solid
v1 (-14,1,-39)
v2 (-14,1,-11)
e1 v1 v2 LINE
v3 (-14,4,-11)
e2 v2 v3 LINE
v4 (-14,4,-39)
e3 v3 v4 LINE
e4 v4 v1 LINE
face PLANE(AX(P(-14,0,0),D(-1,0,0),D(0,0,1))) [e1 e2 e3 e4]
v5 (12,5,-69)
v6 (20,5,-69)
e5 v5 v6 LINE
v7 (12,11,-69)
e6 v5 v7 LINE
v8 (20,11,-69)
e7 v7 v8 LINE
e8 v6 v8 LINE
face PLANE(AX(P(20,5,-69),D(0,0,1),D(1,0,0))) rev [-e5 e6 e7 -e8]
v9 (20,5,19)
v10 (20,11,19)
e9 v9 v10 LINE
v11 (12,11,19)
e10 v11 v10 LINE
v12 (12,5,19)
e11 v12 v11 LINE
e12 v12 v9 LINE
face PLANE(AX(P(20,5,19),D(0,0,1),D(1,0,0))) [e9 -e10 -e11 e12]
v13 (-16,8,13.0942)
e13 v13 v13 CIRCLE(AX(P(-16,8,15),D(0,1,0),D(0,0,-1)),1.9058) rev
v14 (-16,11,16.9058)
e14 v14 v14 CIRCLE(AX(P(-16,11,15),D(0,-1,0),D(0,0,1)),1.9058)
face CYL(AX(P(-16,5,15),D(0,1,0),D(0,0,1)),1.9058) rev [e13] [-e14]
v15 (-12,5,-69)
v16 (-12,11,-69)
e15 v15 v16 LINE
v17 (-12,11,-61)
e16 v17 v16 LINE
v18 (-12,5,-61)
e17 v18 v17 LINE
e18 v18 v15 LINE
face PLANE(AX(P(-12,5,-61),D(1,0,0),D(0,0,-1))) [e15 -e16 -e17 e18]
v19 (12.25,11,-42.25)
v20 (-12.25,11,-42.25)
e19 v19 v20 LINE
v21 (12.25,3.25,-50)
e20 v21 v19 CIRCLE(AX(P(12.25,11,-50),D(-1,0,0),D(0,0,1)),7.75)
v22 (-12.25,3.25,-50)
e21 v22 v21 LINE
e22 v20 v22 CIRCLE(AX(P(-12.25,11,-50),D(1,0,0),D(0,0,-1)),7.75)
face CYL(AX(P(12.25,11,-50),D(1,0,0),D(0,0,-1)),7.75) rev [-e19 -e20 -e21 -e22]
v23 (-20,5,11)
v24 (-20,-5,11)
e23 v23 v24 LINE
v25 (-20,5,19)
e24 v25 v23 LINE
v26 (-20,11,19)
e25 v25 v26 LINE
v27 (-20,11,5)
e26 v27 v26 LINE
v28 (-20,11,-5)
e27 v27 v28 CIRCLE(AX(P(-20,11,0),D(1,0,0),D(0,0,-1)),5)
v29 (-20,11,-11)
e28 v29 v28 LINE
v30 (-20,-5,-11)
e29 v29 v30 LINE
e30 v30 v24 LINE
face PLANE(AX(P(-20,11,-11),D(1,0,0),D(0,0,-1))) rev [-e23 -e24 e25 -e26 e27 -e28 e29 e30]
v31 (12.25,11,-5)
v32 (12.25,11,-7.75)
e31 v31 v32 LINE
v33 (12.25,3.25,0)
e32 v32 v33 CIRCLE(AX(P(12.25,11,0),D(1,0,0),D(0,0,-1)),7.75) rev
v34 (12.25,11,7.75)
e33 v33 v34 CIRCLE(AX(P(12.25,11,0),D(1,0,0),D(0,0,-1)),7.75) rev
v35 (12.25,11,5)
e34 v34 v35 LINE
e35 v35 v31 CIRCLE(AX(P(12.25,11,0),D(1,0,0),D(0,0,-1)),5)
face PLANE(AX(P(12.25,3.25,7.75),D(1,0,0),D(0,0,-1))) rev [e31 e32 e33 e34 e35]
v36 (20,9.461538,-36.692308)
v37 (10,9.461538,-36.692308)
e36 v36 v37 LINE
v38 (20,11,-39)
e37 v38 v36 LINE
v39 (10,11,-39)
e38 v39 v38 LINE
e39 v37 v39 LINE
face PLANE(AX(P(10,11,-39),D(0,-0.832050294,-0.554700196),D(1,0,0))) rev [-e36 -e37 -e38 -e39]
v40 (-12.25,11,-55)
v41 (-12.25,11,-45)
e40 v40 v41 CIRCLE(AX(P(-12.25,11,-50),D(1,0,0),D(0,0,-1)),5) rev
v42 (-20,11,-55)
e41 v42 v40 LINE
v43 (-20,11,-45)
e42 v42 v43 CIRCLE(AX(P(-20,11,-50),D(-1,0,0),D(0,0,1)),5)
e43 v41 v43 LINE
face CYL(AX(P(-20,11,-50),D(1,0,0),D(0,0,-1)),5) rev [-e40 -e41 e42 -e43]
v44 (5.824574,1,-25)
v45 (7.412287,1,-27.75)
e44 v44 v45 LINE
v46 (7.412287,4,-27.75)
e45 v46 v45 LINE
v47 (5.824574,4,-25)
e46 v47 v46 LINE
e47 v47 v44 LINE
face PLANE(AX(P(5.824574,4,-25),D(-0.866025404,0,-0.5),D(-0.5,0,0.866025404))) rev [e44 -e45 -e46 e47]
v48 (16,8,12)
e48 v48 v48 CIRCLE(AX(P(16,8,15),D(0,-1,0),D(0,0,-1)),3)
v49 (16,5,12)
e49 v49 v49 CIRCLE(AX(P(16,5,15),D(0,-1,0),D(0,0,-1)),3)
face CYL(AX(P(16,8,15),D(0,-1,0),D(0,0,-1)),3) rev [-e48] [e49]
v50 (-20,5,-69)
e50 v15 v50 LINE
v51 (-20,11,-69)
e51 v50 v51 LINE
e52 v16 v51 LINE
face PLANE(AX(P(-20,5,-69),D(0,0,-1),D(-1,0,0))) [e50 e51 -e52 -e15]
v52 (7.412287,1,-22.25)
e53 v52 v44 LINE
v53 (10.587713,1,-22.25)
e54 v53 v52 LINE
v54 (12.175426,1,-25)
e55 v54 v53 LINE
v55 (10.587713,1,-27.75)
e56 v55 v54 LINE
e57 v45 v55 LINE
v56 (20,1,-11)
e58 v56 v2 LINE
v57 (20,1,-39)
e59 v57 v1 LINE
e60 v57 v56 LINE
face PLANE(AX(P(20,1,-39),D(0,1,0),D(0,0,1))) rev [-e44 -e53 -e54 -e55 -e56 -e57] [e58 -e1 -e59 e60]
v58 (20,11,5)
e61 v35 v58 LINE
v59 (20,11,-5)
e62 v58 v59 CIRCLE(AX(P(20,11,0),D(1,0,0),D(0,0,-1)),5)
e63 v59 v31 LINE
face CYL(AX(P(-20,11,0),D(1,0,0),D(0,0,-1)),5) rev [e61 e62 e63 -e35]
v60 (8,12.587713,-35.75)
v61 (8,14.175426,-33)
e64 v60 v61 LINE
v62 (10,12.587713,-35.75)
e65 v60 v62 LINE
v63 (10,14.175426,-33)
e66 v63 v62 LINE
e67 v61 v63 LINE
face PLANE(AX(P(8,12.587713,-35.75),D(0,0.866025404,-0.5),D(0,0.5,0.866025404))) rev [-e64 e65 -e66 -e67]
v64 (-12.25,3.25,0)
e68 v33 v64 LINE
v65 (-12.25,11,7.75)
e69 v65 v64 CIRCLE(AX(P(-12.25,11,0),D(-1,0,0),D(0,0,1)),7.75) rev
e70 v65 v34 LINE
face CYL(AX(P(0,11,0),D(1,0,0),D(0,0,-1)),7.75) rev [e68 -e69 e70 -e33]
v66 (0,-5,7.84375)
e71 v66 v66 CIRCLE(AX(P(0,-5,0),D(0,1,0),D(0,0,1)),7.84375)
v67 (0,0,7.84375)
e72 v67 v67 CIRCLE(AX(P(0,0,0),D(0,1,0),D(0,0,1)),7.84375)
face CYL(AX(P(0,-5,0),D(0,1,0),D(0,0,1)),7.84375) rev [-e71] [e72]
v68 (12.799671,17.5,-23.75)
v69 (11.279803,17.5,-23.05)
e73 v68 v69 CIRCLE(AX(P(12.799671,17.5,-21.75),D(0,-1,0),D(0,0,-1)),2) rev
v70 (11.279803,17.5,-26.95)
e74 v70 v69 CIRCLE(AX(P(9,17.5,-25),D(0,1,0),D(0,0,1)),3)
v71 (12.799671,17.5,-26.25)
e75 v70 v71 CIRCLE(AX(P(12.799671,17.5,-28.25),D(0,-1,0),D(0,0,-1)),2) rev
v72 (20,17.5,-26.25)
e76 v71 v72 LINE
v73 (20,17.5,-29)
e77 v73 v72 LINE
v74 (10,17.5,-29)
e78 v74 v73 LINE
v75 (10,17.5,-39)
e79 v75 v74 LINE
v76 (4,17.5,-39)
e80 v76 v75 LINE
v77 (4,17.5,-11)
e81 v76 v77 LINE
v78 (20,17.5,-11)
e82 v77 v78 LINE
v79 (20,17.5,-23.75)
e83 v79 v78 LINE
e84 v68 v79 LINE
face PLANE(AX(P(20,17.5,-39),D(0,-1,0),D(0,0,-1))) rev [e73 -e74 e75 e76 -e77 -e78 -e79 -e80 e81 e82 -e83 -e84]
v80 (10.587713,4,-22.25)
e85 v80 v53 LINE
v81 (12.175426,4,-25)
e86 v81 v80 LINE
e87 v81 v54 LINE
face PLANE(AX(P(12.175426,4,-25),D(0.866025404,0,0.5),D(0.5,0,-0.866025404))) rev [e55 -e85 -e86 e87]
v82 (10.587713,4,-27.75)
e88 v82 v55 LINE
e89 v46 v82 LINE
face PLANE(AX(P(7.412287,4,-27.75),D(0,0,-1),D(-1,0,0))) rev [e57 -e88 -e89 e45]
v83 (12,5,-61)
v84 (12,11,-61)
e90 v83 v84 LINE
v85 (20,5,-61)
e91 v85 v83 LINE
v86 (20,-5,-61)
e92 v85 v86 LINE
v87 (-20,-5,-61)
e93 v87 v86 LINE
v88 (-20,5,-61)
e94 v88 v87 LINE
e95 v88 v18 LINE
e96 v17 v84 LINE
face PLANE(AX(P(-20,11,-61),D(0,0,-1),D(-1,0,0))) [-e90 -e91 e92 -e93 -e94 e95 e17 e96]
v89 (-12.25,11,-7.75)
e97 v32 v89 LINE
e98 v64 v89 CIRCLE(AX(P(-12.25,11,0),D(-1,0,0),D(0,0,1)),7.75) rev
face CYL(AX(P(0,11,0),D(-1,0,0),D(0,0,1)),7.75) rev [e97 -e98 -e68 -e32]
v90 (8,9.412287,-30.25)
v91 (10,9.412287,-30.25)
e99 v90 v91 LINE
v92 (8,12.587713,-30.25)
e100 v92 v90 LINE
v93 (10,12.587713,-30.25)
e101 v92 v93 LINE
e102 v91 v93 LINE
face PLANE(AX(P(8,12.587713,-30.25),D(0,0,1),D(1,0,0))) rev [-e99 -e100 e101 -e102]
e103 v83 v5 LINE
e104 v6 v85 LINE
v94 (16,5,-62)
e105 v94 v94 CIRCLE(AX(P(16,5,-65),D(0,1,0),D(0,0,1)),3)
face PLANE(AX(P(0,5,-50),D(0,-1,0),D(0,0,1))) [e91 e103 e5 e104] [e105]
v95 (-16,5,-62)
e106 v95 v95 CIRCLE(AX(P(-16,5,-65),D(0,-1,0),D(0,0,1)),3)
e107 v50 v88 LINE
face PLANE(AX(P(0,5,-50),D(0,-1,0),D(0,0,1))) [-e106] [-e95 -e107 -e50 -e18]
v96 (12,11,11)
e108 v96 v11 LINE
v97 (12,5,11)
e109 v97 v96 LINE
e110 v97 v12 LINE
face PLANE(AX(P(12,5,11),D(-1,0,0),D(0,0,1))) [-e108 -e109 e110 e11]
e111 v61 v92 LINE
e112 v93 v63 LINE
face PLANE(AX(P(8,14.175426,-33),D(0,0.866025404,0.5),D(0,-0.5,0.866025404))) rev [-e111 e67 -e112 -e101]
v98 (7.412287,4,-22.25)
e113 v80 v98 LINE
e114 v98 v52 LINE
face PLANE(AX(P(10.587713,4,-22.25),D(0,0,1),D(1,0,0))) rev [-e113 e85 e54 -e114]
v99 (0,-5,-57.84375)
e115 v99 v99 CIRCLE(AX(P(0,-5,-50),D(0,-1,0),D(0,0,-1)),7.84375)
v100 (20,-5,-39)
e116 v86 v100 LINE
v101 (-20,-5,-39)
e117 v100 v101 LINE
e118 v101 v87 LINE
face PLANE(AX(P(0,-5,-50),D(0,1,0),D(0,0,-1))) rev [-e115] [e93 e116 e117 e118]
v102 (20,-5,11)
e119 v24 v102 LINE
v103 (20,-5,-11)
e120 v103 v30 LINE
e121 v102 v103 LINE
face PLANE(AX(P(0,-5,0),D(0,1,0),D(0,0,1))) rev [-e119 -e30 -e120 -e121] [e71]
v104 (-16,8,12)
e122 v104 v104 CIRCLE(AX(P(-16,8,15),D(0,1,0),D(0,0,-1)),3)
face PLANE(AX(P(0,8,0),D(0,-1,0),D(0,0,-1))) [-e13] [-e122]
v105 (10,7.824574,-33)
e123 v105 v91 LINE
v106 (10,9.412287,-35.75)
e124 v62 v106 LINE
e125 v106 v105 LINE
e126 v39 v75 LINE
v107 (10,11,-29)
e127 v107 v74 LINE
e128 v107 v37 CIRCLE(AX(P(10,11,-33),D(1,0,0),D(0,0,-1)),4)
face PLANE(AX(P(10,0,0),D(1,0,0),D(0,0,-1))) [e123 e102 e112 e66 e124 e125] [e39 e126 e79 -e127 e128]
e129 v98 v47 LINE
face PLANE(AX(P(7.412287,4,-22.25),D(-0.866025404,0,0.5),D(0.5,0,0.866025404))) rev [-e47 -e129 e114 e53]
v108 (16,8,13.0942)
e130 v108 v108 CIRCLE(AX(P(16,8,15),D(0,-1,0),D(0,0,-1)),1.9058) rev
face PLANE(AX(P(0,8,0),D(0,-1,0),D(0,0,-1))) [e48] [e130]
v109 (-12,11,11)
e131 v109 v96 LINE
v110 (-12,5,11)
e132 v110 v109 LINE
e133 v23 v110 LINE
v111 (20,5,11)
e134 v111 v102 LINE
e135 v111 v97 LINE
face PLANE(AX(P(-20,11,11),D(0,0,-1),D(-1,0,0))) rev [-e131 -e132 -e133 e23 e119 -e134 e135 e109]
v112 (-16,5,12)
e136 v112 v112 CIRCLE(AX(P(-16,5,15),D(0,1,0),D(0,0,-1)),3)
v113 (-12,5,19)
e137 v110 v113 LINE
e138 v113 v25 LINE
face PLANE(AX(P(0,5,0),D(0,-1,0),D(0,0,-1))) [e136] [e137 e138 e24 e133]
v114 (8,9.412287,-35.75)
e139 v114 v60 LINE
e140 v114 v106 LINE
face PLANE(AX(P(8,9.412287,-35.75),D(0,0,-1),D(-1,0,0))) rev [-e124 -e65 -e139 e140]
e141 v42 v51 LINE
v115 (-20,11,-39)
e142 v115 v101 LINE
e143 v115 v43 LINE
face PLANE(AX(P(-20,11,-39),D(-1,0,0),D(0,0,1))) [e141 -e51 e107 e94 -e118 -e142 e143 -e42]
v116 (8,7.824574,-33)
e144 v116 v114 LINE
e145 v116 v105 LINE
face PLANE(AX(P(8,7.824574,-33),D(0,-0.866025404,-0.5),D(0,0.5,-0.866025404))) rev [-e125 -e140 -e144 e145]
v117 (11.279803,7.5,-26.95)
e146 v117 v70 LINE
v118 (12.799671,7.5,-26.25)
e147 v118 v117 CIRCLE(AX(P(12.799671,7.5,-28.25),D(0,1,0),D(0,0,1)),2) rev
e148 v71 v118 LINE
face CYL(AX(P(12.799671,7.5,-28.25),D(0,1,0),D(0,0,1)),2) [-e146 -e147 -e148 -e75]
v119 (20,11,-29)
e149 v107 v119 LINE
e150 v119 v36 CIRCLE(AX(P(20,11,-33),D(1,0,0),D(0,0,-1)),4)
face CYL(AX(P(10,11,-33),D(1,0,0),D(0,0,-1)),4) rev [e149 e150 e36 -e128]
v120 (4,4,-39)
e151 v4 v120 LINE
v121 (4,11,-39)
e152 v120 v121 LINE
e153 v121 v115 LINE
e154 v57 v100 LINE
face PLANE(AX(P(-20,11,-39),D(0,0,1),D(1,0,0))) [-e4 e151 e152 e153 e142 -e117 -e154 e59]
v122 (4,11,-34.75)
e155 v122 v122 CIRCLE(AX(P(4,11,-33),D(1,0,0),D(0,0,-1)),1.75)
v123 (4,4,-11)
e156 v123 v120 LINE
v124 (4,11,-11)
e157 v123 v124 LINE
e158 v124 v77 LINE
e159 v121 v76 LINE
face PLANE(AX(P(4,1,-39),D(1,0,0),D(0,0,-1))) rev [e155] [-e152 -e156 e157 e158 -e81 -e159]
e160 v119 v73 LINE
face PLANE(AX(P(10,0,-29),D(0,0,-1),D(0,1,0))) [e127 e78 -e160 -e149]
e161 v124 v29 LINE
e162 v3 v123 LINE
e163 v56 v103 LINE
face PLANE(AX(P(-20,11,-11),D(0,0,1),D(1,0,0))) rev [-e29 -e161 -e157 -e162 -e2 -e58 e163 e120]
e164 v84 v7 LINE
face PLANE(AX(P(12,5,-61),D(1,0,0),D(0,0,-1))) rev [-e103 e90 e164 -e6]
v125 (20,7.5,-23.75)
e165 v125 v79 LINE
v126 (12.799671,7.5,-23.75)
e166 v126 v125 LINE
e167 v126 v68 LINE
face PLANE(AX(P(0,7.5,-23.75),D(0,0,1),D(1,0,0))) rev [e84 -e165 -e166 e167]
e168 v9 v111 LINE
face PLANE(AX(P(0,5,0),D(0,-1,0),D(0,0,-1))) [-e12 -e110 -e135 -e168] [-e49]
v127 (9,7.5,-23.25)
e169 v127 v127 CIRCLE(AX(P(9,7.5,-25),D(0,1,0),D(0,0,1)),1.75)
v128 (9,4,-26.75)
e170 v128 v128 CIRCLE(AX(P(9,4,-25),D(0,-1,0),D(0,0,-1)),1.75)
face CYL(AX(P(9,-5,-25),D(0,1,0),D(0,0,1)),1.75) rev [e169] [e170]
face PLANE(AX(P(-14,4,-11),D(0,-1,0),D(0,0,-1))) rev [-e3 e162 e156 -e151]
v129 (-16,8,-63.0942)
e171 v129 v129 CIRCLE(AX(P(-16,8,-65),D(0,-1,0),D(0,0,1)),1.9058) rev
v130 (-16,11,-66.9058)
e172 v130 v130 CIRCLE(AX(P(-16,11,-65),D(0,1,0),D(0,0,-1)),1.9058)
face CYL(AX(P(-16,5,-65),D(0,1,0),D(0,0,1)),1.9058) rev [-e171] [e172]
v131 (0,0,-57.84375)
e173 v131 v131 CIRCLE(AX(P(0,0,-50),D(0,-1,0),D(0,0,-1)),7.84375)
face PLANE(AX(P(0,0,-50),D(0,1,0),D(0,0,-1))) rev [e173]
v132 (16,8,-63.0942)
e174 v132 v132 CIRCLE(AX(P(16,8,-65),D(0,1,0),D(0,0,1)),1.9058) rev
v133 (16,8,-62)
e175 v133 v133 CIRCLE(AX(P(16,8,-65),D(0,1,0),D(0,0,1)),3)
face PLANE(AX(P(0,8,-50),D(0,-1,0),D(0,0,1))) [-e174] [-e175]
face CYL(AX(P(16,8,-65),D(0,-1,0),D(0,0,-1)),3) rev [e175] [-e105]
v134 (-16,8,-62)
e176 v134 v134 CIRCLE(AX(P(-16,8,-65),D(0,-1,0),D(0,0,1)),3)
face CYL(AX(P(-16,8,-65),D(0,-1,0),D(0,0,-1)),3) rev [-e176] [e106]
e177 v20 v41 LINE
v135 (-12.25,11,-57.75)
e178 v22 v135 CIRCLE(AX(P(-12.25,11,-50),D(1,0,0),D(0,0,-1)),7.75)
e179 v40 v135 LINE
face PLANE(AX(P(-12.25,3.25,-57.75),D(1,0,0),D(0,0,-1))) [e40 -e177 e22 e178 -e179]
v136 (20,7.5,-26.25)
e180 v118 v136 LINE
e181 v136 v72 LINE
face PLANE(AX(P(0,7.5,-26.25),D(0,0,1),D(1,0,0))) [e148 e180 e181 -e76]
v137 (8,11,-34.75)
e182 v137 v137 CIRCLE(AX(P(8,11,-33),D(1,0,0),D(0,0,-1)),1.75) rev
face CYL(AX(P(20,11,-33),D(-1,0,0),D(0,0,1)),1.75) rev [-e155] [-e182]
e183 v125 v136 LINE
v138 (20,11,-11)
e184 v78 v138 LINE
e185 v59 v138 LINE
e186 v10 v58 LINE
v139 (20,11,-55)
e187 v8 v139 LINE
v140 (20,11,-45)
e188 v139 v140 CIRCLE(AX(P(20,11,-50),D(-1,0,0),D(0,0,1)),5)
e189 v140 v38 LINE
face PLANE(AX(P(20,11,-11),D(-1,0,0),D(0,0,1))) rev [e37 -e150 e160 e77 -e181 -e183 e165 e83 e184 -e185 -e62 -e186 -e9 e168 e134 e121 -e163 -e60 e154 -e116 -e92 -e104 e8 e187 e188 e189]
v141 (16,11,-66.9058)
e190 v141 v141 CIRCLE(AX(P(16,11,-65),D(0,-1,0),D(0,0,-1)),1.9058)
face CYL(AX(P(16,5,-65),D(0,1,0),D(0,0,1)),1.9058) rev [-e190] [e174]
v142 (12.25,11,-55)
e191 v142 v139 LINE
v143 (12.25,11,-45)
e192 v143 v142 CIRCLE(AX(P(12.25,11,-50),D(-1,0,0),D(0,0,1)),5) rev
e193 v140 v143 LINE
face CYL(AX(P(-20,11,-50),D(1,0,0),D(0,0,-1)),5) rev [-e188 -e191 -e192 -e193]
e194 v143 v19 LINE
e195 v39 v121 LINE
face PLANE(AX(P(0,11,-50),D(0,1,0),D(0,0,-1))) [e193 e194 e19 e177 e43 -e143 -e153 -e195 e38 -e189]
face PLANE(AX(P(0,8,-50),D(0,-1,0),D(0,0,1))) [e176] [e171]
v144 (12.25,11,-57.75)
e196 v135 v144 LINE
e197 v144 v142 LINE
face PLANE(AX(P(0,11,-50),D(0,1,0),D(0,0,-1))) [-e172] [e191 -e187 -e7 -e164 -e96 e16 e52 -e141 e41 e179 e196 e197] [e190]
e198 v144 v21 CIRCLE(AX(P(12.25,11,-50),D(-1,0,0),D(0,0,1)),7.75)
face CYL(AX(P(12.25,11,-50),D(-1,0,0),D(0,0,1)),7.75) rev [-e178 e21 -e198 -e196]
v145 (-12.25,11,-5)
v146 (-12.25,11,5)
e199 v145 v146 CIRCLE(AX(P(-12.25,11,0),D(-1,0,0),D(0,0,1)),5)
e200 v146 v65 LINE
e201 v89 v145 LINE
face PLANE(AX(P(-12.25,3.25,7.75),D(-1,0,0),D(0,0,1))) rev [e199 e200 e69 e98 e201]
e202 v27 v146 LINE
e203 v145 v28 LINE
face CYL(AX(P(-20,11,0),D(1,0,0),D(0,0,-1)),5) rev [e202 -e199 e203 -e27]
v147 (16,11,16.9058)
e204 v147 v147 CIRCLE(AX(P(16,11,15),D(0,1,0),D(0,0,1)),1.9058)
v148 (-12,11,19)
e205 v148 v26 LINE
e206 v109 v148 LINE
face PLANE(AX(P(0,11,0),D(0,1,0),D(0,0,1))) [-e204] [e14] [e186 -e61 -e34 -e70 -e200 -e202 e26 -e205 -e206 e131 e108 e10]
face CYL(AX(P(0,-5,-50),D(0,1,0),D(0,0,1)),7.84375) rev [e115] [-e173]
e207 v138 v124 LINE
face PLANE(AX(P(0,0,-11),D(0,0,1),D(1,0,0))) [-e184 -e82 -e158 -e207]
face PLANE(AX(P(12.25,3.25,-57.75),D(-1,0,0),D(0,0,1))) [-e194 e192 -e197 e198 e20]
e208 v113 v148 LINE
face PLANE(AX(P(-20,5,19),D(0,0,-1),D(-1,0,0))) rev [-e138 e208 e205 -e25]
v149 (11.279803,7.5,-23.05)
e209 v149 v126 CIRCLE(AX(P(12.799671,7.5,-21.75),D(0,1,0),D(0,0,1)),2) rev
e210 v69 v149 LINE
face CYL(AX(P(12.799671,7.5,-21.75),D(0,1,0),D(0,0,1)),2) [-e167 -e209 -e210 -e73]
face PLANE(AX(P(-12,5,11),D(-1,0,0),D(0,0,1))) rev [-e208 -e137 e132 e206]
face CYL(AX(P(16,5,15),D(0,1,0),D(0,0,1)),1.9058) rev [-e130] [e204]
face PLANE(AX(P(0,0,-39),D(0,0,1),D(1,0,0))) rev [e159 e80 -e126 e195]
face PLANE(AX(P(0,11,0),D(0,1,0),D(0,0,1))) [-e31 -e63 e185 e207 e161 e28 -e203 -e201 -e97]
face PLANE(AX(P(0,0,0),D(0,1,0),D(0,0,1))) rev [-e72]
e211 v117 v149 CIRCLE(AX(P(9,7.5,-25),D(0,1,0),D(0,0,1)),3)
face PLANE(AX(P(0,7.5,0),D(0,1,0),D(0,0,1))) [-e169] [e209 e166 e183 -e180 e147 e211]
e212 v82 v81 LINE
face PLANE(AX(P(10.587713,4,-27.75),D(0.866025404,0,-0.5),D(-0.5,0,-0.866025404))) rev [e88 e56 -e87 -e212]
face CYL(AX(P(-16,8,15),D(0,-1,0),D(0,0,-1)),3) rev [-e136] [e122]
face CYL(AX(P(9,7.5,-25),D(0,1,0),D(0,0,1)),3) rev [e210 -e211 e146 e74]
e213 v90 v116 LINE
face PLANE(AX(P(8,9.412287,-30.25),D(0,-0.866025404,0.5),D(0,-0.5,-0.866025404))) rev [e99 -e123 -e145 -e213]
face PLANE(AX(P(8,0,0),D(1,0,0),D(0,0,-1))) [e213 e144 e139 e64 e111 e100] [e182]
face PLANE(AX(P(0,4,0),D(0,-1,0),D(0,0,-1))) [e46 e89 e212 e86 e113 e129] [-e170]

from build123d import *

# Parameters (mm, degrees)
SKETCH1_W                  = 40
SKETCH1_H                  = 22
BOSS_EXTRUDE1_DEPTH        = 11
SKETCH2_W                  = 40
SKETCH2_H                  = 22
SKETCH2_R                  = 7.843750423
BOSS_EXTRUDE2_DEPTH        = 5
SKETCH3_W                  = 24.5
SKETCH3_H                  = 15.5
CUT_EXTRUDE1_DEPTH         = 7.75
FILLET1_R                  = 7.75
SKETCH4_R                  = 5
CUT_EXTRUDE2_DEPTH         = 36.805900352
SKETCH5_W                  = 8
SKETCH5_H                  = 8
SKETCH5_R                  = 1.905800151
BOSS_EXTRUDE3_DEPTH        = 6
CUT_EXTRUDE3_START         = -3
SKETCH6_R                  = 3
SKETCH6_R_2                = 1.905800151
CUT_EXTRUDE3_DEPTH         = 3
SKETCH7_W                  = 16
SKETCH7_H                  = 16.5
BOSS_EXTRUDE5_DEPTH        = 28
MIRROR14_COPY_1_SKETCH_W   = 8
MIRROR14_COPY_1_SKETCH_H   = 8
MIRROR14_COPY_1_SKETCH_R   = 1.905800151
MIRROR14_COPY_1_DEPTH      = 6
MIRROR14_START             = -3
MIRROR14_COPY_2_SKETCH_R   = 3
MIRROR14_COPY_2_SKETCH_R_2 = 1.905800151
MIRROR14_COPY_2_DEPTH      = 3
FILLET1_OF_MIRROR14_R      = 7.75
SKETCH9_W                  = 28
SKETCH9_H                  = 3
BOSS_EXTRUDE6_DEPTH        = 18
CUT_EXTRUDE4_DEPTH         = 10
CUT_EXTRUDE5_DEPTH         = 73.919476136
CUT_EXTRUDE5_DEPTH_BACK    = 73.919476136
SKETCH11_R                 = 1.75
CUT_EXTRUDE6_DEPTH         = 76.121568141
CUT_EXTRUDE6_DEPTH_BACK    = 76.121568141
SKETCH12_R                 = 1.75
CUT_EXTRUDE9_DEPTH         = 12
CUT_EXTRUDE11_START        = -10
SKETCH16_R                 = 4
SKETCH16_R_2               = 1.75
SKETCH16_W                 = 10
SKETCH16_H                 = 6.5
CUT_EXTRUDE11_DEPTH        = 10
FILLET2_R                  = 2
CUT_EXTRUDE12_START        = -3
SKETCH17_R                 = 1.75
CUT_EXTRUDE12_DEPTH        = 3


# Some blends are built 0.0001 mm under size
with BuildPart() as part:
    # Sketch1 → Boss-Extrude1 (new body)
    with BuildSketch(Plane(origin=(0, 0, 0), x_dir=(1, 0, 0), z_dir=(0, 1, 0))):
        Rectangle(SKETCH1_W, SKETCH1_H)
    boss_extrude1 = extrude(amount=BOSS_EXTRUDE1_DEPTH)

    # Sketch2 → Boss-Extrude2 (add)
    with BuildSketch(Plane(origin=(0, 0, 0), x_dir=(1, 0, 0), z_dir=(0, 1, 0))):
        Rectangle(SKETCH2_W, SKETCH2_H)
        with Locations(Location((0, 0, 0), (0, 0, 270))):
            Circle(SKETCH2_R, mode=Mode.SUBTRACT)
    boss_extrude2 = extrude(amount=-BOSS_EXTRUDE2_DEPTH)

    # Sketch3 → Cut-Extrude1 (cut)
    with BuildSketch(Plane(origin=(0, 11, 0), x_dir=(1, 0, 0), z_dir=(0, 1, 0))):
        Rectangle(SKETCH3_W, SKETCH3_H)
    cut_extrude1 = extrude(amount=-CUT_EXTRUDE1_DEPTH, mode=Mode.SUBTRACT)

    # Fillet1
    fillet1_edges = [part.edges().sort_by_distance(p)[0] for p in [
        (0, 3.25, 7.75),
        (0, 3.25, -7.75),
    ]]
    fillet(fillet1_edges, radius=FILLET1_R - 0.0001)  # a hair under: the kernel refuses the full size

    # Sketch4 → Cut-Extrude2 (cut, symmetric)
    with BuildSketch(Plane(origin=(-12.25, 0, 0), x_dir=(0, 0, -1), z_dir=(1, 0, 0))):
        with Locations((0, 11)):
            Circle(SKETCH4_R)
    cut_extrude2 = extrude(amount=CUT_EXTRUDE2_DEPTH, both=True, mode=Mode.SUBTRACT)

    # Sketch5 → Boss-Extrude3 (add)
    with BuildSketch(Plane(origin=(0, 11, 0), x_dir=(1, 0, 0), z_dir=(0, 1, 0))):
        with Locations((16, -15)):
            Rectangle(SKETCH5_W, SKETCH5_H)
        with Locations(Location((16, -15, 0), (0, 0, 270))):
            Circle(SKETCH5_R, mode=Mode.SUBTRACT)
    boss_extrude3 = extrude(amount=-BOSS_EXTRUDE3_DEPTH)

    # Sketch6 → Cut-Extrude3 (cut)
    with BuildSketch(Plane.XZ.offset(-5).offset(CUT_EXTRUDE3_START)):
        with Locations(Location((16, 15, 0), (0, 0, 270))):
            Circle(SKETCH6_R)
        with Locations(Location((16, 15, 0), (0, 0, 90))):
            Circle(SKETCH6_R_2, mode=Mode.SUBTRACT)
    cut_extrude3 = extrude(amount=CUT_EXTRUDE3_DEPTH, mode=Mode.SUBTRACT)

    # Mirror8: Boss-Extrude3, Cut-Extrude3 across plane
    add(boss_extrude3.mirror(Plane(origin=(0, 0, 0), x_dir=(0, 0, 1), z_dir=(1, 0, 0))))
    add(cut_extrude3.mirror(Plane(origin=(0, 0, 0), x_dir=(0, 0, 1), z_dir=(1, 0, 0))), mode=Mode.SUBTRACT)

    # Sketch7 → Boss-Extrude5 (add)
    with BuildSketch(Plane(origin=(0, 0, -11), x_dir=(-1, 0, 0), z_dir=(0, 0, -1))):
        with Locations((-12, 9.25)):
            Rectangle(SKETCH7_W, SKETCH7_H)
    extrude(amount=BOSS_EXTRUDE5_DEPTH)

    # Mirror14: Boss-Extrude1, Boss-Extrude2, Cut-Extrude1, Cut-Extrude2, Boss-Extrude3, Cut-Extrude3 across plane
    add(boss_extrude1.mirror(Plane.XY.offset(-25)))
    add(boss_extrude2.mirror(Plane.XY.offset(-25)))
    add(cut_extrude1.mirror(Plane.XY.offset(-25)), mode=Mode.SUBTRACT)
    add(cut_extrude2.mirror(Plane.XY.offset(-25)), mode=Mode.SUBTRACT)
    add(boss_extrude3.mirror(Plane.XY.offset(-25)))
    add(cut_extrude3.mirror(Plane.XY.offset(-25)), mode=Mode.SUBTRACT)

    # Mirror14 copy 1 sketch → Mirror14 copy 1 (add)
    with BuildSketch(Plane(origin=(0, 11, -50), x_dir=(-1, 0, 0), z_dir=(0, 1, 0))):
        with Locations((16, -15)):
            Rectangle(MIRROR14_COPY_1_SKETCH_W, MIRROR14_COPY_1_SKETCH_H)
        with Locations(Location((16, -15, 0), (0, 0, 270))):
            Circle(MIRROR14_COPY_1_SKETCH_R, mode=Mode.SUBTRACT)
    extrude(amount=-MIRROR14_COPY_1_DEPTH)

    # Mirror14 copy 2 sketch → Mirror14 copy 2 (cut)
    with BuildSketch(Plane(origin=(0, 5, -50), x_dir=(-1, 0, 0), z_dir=(0, -1, 0)).offset(MIRROR14_START)):
        with Locations(Location((16, 15, 0), (0, 0, 270))):
            Circle(MIRROR14_COPY_2_SKETCH_R)
        with Locations(Location((16, 15, 0), (0, 0, 90))):
            Circle(MIRROR14_COPY_2_SKETCH_R_2, mode=Mode.SUBTRACT)
    extrude(amount=MIRROR14_COPY_2_DEPTH, mode=Mode.SUBTRACT)

    # Fillet1 of Mirror14
    fillet1_of_mirror14_edges = [part.edges().sort_by_distance(p)[0] for p in [
        (0, 3.25, -57.75),
        (0, 3.25, -42.25),
    ]]
    fillet(fillet1_of_mirror14_edges, radius=FILLET1_OF_MIRROR14_R - 0.0001)  # a hair under: the kernel refuses the full size

    # Sketch9 → Boss-Extrude6 (add)
    with BuildSketch(Plane.ZY.offset(-4)):
        with Locations((-25, 2.5)):
            Rectangle(SKETCH9_W, SKETCH9_H)
    extrude(amount=BOSS_EXTRUDE6_DEPTH)

    # Sketch10 → Cut-Extrude4 (cut)
    with BuildSketch(Plane(origin=(0, 17.5, 0), x_dir=(1, 0, 0), z_dir=(0, 1, 0))):
        with BuildLine():
            Line((9, 26.25), (9, 23.75))
            Line((9, 23.75), (11.727178029, 23.75))
            ThreePointArc((11.727178029, 23.75), (11.931001031, 24.360286817), (12, 25))
            ThreePointArc((12, 25), (11.931001031, 25.639713183), (11.727178029, 26.25))
            Line((11.727178029, 26.25), (9, 26.25))
        make_face()
        with BuildLine():
            Line((11.727178029, 23.75), (9, 23.75))
            Line((9, 23.75), (9, 26.25))
            Line((9, 26.25), (11.727178029, 26.25))
            ThreePointArc((11.727178029, 26.25), (6, 25), (11.727178029, 23.75))
        make_face()
        with BuildLine():
            ThreePointArc((12, 25), (11.931001031, 24.360286817), (11.727178029, 23.75))
            Line((11.727178029, 23.75), (20, 23.75))
            Line((20, 23.75), (20, 26.25))
            Line((20, 26.25), (11.727178029, 26.25))
            ThreePointArc((11.727178029, 26.25), (11.931001031, 25.639713183), (12, 25))
        make_face()
    extrude(amount=-CUT_EXTRUDE4_DEPTH, mode=Mode.SUBTRACT)

    # Sketch11 → Cut-Extrude5 (cut, two sides: drawn at the far end of the back side and taken through both)
    with BuildSketch(Plane(origin=(0, 7.5, 0), x_dir=(1, 0, 0), z_dir=(0, 1, 0)).offset(-CUT_EXTRUDE5_DEPTH_BACK)):
        with Locations(Location((9, 25, 0), (0, 0, 270))):
            Circle(SKETCH11_R)
    extrude(amount=CUT_EXTRUDE5_DEPTH + CUT_EXTRUDE5_DEPTH_BACK, mode=Mode.SUBTRACT)

    # Sketch12 → Cut-Extrude6 (cut, two sides: drawn at the far end of the back side and taken through both)
    with BuildSketch(Plane.ZY.offset(-4).offset(-CUT_EXTRUDE6_DEPTH_BACK)):
        with Locations((-33, 11)):
            Circle(SKETCH12_R)
    extrude(amount=CUT_EXTRUDE6_DEPTH + CUT_EXTRUDE6_DEPTH_BACK, mode=Mode.SUBTRACT)

    # Sketch15 → Cut-Extrude9 (cut)
    with BuildSketch(Plane(origin=(20, 0, 0), x_dir=(0, 0, -1), z_dir=(1, 0, 0))):
        Polygon((33, 14.175426481), (30.25, 12.58771324), (30.25, 9.41228676), (33, 7.824573519), (35.75, 9.41228676), (35.75, 12.58771324), align=None)
    extrude(amount=-CUT_EXTRUDE9_DEPTH, mode=Mode.SUBTRACT)

    # Sketch16 → Cut-Extrude11 (cut)
    # profile 1 of 2: a face of its own
    with BuildSketch(Plane(origin=(20, 0, 0), x_dir=(0, 0, -1), z_dir=(1, 0, 0)).offset(CUT_EXTRUDE11_START)):
        with Locations((33, 11)):
            Circle(SKETCH16_R)
        with Locations((33, 11)):
            Circle(SKETCH16_R_2, mode=Mode.SUBTRACT)
    # profile 2 of 2: a face of its own
    with BuildSketch(Plane(origin=(20, 0, 0), x_dir=(0, 0, -1), z_dir=(1, 0, 0)).offset(CUT_EXTRUDE11_START)):
        with Locations((34, 14.25)):
            Rectangle(SKETCH16_W, SKETCH16_H)
    extrude(amount=CUT_EXTRUDE11_DEPTH, mode=Mode.SUBTRACT)

    # Chamfer3
    # the kernel refuses this chamfer: 2.5 mm, written as the material it takes off along each edge
    with BuildSketch(Plane(origin=(4.790141486, 11, -37), x_dir=(0, -0.9712202897009368, 0.23818301550116588), z_dir=(1, 0, 0))) as chamfer3_piece_1_section:
        with BuildLine():
            Line((1.641163776, 0), (-0.550057664, 2.010038976))
            Line((-0.550057664, 2.010038976), (-0.598618679, 1.998129825))
            ThreePointArc((-0.598618679, 1.998129825), (-0.296653042, 0.999716345), (-0.048561014, -0.011909151))
            Line((-0.048561014, -0.011909151), (0.011909151, -0.048561014))
            ThreePointArc((0.011909151, -0.048561014), (0.818444442, 0.062835502), (1.633479525, -0.049405994))
            Line((1.633479525, -0.049405994), (1.641163776, 0))
        make_face()
    chamfer3_piece_1 = extrude(amount=20.419717028, mode=Mode.PRIVATE)
    chamfer3_piece_1 = split(chamfer3_piece_1, bisect_by=Plane(origin=(10, 11.063270064, -39.03704072), z_dir=(-1, 0, 0)), keep=Keep.TOP, mode=Mode.PRIVATE)
    chamfer3_piece_1 = split(chamfer3_piece_1, bisect_by=Plane(origin=(7.395070743, 11.063270064, -39), z_dir=(0, 0, -1)), keep=Keep.TOP, mode=Mode.PRIVATE)
    add(chamfer3_piece_1, mode=Mode.SUBTRACT)
    with BuildSketch(Plane(origin=(10, 11, -37), x_dir=(0, -0.9712202897009377, 0.23818301550116178), z_dir=(1, 0, 0))) as chamfer3_piece_2_section:
        with BuildLine():
            Line((1.641163776, 0), (-0.550057664, 2.010038976))
            Line((-0.550057664, 2.010038976), (-0.598618679, 1.998129825))
            ThreePointArc((-0.598618679, 1.998129825), (-0.296653042, 0.999716345), (-0.048561014, -0.011909151))
            Line((-0.048561014, -0.011909151), (0.011909151, -0.048561014))
            ThreePointArc((0.011909151, -0.048561014), (0.818444442, 0.062835502), (1.633479525, -0.049405994))
            Line((1.633479525, -0.049405994), (1.641163776, 0))
        make_face()
    chamfer3_piece_2 = extrude(amount=15.209858514, mode=Mode.PRIVATE)
    chamfer3_piece_2 = split(chamfer3_piece_2, bisect_by=Plane(origin=(17.604929257, 10.514615405, -39), z_dir=(0, 0, 1)), keep=Keep.TOP, mode=Mode.PRIVATE)
    add(chamfer3_piece_2, mode=Mode.SUBTRACT)
    with BuildSketch(Plane(origin=(10, 11, -37), x_dir=(0, -0.9712202897009377, 0.23818301550116178), z_dir=(1, 0, 0))) as chamfer3_piece_3_section:
        with BuildLine():
            Line((1.641163776, 0), (-0.550057664, 2.010038976))
            Line((-0.550057664, 2.010038976), (-0.598618679, 1.998129825))
            ThreePointArc((-0.598618679, 1.998129825), (-0.296653042, 0.999716345), (-0.048561014, -0.011909151))
            Line((-0.048561014, -0.011909151), (0.011909151, -0.048561014))
            ThreePointArc((0.011909151, -0.048561014), (0.818444442, 0.062835502), (1.633479525, -0.049405994))
            Line((1.633479525, -0.049405994), (1.641163776, 0))
        make_face()
    chamfer3_piece_3 = extrude(amount=15.209858514, mode=Mode.PRIVATE)
    chamfer3_piece_3 = split(chamfer3_piece_3, bisect_by=Plane(origin=(17.604929257, 11.063270064, -39), z_dir=(0, 0, -1)), keep=Keep.TOP, mode=Mode.PRIVATE)
    add(chamfer3_piece_3, mode=Mode.SUBTRACT)

    # Fillet2
    fillet2_edges = [part.edges().sort_by_distance(p)[0] for p in [
        (11.727178029, 12.5, -23.75),
        (11.727178029, 12.5, -26.25),
    ]]
    fillet(fillet2_edges, radius=FILLET2_R)

    # Sketch17 → Cut-Extrude12 (cut)
    with BuildSketch(Plane.XZ.offset(-1).offset(CUT_EXTRUDE12_START)):
        Polygon((12.175426481, -25), (10.58771324, -22.25), (7.41228676, -22.25), (5.824573519, -25), (7.41228676, -27.75), (10.58771324, -27.75), align=None)
        with Locations(Location((9, -25, 0), (0, 0, 90))):
            Circle(SKETCH17_R, mode=Mode.SUBTRACT)
    extrude(amount=CUT_EXTRUDE12_DEPTH, mode=Mode.SUBTRACT)


solid = part.part
